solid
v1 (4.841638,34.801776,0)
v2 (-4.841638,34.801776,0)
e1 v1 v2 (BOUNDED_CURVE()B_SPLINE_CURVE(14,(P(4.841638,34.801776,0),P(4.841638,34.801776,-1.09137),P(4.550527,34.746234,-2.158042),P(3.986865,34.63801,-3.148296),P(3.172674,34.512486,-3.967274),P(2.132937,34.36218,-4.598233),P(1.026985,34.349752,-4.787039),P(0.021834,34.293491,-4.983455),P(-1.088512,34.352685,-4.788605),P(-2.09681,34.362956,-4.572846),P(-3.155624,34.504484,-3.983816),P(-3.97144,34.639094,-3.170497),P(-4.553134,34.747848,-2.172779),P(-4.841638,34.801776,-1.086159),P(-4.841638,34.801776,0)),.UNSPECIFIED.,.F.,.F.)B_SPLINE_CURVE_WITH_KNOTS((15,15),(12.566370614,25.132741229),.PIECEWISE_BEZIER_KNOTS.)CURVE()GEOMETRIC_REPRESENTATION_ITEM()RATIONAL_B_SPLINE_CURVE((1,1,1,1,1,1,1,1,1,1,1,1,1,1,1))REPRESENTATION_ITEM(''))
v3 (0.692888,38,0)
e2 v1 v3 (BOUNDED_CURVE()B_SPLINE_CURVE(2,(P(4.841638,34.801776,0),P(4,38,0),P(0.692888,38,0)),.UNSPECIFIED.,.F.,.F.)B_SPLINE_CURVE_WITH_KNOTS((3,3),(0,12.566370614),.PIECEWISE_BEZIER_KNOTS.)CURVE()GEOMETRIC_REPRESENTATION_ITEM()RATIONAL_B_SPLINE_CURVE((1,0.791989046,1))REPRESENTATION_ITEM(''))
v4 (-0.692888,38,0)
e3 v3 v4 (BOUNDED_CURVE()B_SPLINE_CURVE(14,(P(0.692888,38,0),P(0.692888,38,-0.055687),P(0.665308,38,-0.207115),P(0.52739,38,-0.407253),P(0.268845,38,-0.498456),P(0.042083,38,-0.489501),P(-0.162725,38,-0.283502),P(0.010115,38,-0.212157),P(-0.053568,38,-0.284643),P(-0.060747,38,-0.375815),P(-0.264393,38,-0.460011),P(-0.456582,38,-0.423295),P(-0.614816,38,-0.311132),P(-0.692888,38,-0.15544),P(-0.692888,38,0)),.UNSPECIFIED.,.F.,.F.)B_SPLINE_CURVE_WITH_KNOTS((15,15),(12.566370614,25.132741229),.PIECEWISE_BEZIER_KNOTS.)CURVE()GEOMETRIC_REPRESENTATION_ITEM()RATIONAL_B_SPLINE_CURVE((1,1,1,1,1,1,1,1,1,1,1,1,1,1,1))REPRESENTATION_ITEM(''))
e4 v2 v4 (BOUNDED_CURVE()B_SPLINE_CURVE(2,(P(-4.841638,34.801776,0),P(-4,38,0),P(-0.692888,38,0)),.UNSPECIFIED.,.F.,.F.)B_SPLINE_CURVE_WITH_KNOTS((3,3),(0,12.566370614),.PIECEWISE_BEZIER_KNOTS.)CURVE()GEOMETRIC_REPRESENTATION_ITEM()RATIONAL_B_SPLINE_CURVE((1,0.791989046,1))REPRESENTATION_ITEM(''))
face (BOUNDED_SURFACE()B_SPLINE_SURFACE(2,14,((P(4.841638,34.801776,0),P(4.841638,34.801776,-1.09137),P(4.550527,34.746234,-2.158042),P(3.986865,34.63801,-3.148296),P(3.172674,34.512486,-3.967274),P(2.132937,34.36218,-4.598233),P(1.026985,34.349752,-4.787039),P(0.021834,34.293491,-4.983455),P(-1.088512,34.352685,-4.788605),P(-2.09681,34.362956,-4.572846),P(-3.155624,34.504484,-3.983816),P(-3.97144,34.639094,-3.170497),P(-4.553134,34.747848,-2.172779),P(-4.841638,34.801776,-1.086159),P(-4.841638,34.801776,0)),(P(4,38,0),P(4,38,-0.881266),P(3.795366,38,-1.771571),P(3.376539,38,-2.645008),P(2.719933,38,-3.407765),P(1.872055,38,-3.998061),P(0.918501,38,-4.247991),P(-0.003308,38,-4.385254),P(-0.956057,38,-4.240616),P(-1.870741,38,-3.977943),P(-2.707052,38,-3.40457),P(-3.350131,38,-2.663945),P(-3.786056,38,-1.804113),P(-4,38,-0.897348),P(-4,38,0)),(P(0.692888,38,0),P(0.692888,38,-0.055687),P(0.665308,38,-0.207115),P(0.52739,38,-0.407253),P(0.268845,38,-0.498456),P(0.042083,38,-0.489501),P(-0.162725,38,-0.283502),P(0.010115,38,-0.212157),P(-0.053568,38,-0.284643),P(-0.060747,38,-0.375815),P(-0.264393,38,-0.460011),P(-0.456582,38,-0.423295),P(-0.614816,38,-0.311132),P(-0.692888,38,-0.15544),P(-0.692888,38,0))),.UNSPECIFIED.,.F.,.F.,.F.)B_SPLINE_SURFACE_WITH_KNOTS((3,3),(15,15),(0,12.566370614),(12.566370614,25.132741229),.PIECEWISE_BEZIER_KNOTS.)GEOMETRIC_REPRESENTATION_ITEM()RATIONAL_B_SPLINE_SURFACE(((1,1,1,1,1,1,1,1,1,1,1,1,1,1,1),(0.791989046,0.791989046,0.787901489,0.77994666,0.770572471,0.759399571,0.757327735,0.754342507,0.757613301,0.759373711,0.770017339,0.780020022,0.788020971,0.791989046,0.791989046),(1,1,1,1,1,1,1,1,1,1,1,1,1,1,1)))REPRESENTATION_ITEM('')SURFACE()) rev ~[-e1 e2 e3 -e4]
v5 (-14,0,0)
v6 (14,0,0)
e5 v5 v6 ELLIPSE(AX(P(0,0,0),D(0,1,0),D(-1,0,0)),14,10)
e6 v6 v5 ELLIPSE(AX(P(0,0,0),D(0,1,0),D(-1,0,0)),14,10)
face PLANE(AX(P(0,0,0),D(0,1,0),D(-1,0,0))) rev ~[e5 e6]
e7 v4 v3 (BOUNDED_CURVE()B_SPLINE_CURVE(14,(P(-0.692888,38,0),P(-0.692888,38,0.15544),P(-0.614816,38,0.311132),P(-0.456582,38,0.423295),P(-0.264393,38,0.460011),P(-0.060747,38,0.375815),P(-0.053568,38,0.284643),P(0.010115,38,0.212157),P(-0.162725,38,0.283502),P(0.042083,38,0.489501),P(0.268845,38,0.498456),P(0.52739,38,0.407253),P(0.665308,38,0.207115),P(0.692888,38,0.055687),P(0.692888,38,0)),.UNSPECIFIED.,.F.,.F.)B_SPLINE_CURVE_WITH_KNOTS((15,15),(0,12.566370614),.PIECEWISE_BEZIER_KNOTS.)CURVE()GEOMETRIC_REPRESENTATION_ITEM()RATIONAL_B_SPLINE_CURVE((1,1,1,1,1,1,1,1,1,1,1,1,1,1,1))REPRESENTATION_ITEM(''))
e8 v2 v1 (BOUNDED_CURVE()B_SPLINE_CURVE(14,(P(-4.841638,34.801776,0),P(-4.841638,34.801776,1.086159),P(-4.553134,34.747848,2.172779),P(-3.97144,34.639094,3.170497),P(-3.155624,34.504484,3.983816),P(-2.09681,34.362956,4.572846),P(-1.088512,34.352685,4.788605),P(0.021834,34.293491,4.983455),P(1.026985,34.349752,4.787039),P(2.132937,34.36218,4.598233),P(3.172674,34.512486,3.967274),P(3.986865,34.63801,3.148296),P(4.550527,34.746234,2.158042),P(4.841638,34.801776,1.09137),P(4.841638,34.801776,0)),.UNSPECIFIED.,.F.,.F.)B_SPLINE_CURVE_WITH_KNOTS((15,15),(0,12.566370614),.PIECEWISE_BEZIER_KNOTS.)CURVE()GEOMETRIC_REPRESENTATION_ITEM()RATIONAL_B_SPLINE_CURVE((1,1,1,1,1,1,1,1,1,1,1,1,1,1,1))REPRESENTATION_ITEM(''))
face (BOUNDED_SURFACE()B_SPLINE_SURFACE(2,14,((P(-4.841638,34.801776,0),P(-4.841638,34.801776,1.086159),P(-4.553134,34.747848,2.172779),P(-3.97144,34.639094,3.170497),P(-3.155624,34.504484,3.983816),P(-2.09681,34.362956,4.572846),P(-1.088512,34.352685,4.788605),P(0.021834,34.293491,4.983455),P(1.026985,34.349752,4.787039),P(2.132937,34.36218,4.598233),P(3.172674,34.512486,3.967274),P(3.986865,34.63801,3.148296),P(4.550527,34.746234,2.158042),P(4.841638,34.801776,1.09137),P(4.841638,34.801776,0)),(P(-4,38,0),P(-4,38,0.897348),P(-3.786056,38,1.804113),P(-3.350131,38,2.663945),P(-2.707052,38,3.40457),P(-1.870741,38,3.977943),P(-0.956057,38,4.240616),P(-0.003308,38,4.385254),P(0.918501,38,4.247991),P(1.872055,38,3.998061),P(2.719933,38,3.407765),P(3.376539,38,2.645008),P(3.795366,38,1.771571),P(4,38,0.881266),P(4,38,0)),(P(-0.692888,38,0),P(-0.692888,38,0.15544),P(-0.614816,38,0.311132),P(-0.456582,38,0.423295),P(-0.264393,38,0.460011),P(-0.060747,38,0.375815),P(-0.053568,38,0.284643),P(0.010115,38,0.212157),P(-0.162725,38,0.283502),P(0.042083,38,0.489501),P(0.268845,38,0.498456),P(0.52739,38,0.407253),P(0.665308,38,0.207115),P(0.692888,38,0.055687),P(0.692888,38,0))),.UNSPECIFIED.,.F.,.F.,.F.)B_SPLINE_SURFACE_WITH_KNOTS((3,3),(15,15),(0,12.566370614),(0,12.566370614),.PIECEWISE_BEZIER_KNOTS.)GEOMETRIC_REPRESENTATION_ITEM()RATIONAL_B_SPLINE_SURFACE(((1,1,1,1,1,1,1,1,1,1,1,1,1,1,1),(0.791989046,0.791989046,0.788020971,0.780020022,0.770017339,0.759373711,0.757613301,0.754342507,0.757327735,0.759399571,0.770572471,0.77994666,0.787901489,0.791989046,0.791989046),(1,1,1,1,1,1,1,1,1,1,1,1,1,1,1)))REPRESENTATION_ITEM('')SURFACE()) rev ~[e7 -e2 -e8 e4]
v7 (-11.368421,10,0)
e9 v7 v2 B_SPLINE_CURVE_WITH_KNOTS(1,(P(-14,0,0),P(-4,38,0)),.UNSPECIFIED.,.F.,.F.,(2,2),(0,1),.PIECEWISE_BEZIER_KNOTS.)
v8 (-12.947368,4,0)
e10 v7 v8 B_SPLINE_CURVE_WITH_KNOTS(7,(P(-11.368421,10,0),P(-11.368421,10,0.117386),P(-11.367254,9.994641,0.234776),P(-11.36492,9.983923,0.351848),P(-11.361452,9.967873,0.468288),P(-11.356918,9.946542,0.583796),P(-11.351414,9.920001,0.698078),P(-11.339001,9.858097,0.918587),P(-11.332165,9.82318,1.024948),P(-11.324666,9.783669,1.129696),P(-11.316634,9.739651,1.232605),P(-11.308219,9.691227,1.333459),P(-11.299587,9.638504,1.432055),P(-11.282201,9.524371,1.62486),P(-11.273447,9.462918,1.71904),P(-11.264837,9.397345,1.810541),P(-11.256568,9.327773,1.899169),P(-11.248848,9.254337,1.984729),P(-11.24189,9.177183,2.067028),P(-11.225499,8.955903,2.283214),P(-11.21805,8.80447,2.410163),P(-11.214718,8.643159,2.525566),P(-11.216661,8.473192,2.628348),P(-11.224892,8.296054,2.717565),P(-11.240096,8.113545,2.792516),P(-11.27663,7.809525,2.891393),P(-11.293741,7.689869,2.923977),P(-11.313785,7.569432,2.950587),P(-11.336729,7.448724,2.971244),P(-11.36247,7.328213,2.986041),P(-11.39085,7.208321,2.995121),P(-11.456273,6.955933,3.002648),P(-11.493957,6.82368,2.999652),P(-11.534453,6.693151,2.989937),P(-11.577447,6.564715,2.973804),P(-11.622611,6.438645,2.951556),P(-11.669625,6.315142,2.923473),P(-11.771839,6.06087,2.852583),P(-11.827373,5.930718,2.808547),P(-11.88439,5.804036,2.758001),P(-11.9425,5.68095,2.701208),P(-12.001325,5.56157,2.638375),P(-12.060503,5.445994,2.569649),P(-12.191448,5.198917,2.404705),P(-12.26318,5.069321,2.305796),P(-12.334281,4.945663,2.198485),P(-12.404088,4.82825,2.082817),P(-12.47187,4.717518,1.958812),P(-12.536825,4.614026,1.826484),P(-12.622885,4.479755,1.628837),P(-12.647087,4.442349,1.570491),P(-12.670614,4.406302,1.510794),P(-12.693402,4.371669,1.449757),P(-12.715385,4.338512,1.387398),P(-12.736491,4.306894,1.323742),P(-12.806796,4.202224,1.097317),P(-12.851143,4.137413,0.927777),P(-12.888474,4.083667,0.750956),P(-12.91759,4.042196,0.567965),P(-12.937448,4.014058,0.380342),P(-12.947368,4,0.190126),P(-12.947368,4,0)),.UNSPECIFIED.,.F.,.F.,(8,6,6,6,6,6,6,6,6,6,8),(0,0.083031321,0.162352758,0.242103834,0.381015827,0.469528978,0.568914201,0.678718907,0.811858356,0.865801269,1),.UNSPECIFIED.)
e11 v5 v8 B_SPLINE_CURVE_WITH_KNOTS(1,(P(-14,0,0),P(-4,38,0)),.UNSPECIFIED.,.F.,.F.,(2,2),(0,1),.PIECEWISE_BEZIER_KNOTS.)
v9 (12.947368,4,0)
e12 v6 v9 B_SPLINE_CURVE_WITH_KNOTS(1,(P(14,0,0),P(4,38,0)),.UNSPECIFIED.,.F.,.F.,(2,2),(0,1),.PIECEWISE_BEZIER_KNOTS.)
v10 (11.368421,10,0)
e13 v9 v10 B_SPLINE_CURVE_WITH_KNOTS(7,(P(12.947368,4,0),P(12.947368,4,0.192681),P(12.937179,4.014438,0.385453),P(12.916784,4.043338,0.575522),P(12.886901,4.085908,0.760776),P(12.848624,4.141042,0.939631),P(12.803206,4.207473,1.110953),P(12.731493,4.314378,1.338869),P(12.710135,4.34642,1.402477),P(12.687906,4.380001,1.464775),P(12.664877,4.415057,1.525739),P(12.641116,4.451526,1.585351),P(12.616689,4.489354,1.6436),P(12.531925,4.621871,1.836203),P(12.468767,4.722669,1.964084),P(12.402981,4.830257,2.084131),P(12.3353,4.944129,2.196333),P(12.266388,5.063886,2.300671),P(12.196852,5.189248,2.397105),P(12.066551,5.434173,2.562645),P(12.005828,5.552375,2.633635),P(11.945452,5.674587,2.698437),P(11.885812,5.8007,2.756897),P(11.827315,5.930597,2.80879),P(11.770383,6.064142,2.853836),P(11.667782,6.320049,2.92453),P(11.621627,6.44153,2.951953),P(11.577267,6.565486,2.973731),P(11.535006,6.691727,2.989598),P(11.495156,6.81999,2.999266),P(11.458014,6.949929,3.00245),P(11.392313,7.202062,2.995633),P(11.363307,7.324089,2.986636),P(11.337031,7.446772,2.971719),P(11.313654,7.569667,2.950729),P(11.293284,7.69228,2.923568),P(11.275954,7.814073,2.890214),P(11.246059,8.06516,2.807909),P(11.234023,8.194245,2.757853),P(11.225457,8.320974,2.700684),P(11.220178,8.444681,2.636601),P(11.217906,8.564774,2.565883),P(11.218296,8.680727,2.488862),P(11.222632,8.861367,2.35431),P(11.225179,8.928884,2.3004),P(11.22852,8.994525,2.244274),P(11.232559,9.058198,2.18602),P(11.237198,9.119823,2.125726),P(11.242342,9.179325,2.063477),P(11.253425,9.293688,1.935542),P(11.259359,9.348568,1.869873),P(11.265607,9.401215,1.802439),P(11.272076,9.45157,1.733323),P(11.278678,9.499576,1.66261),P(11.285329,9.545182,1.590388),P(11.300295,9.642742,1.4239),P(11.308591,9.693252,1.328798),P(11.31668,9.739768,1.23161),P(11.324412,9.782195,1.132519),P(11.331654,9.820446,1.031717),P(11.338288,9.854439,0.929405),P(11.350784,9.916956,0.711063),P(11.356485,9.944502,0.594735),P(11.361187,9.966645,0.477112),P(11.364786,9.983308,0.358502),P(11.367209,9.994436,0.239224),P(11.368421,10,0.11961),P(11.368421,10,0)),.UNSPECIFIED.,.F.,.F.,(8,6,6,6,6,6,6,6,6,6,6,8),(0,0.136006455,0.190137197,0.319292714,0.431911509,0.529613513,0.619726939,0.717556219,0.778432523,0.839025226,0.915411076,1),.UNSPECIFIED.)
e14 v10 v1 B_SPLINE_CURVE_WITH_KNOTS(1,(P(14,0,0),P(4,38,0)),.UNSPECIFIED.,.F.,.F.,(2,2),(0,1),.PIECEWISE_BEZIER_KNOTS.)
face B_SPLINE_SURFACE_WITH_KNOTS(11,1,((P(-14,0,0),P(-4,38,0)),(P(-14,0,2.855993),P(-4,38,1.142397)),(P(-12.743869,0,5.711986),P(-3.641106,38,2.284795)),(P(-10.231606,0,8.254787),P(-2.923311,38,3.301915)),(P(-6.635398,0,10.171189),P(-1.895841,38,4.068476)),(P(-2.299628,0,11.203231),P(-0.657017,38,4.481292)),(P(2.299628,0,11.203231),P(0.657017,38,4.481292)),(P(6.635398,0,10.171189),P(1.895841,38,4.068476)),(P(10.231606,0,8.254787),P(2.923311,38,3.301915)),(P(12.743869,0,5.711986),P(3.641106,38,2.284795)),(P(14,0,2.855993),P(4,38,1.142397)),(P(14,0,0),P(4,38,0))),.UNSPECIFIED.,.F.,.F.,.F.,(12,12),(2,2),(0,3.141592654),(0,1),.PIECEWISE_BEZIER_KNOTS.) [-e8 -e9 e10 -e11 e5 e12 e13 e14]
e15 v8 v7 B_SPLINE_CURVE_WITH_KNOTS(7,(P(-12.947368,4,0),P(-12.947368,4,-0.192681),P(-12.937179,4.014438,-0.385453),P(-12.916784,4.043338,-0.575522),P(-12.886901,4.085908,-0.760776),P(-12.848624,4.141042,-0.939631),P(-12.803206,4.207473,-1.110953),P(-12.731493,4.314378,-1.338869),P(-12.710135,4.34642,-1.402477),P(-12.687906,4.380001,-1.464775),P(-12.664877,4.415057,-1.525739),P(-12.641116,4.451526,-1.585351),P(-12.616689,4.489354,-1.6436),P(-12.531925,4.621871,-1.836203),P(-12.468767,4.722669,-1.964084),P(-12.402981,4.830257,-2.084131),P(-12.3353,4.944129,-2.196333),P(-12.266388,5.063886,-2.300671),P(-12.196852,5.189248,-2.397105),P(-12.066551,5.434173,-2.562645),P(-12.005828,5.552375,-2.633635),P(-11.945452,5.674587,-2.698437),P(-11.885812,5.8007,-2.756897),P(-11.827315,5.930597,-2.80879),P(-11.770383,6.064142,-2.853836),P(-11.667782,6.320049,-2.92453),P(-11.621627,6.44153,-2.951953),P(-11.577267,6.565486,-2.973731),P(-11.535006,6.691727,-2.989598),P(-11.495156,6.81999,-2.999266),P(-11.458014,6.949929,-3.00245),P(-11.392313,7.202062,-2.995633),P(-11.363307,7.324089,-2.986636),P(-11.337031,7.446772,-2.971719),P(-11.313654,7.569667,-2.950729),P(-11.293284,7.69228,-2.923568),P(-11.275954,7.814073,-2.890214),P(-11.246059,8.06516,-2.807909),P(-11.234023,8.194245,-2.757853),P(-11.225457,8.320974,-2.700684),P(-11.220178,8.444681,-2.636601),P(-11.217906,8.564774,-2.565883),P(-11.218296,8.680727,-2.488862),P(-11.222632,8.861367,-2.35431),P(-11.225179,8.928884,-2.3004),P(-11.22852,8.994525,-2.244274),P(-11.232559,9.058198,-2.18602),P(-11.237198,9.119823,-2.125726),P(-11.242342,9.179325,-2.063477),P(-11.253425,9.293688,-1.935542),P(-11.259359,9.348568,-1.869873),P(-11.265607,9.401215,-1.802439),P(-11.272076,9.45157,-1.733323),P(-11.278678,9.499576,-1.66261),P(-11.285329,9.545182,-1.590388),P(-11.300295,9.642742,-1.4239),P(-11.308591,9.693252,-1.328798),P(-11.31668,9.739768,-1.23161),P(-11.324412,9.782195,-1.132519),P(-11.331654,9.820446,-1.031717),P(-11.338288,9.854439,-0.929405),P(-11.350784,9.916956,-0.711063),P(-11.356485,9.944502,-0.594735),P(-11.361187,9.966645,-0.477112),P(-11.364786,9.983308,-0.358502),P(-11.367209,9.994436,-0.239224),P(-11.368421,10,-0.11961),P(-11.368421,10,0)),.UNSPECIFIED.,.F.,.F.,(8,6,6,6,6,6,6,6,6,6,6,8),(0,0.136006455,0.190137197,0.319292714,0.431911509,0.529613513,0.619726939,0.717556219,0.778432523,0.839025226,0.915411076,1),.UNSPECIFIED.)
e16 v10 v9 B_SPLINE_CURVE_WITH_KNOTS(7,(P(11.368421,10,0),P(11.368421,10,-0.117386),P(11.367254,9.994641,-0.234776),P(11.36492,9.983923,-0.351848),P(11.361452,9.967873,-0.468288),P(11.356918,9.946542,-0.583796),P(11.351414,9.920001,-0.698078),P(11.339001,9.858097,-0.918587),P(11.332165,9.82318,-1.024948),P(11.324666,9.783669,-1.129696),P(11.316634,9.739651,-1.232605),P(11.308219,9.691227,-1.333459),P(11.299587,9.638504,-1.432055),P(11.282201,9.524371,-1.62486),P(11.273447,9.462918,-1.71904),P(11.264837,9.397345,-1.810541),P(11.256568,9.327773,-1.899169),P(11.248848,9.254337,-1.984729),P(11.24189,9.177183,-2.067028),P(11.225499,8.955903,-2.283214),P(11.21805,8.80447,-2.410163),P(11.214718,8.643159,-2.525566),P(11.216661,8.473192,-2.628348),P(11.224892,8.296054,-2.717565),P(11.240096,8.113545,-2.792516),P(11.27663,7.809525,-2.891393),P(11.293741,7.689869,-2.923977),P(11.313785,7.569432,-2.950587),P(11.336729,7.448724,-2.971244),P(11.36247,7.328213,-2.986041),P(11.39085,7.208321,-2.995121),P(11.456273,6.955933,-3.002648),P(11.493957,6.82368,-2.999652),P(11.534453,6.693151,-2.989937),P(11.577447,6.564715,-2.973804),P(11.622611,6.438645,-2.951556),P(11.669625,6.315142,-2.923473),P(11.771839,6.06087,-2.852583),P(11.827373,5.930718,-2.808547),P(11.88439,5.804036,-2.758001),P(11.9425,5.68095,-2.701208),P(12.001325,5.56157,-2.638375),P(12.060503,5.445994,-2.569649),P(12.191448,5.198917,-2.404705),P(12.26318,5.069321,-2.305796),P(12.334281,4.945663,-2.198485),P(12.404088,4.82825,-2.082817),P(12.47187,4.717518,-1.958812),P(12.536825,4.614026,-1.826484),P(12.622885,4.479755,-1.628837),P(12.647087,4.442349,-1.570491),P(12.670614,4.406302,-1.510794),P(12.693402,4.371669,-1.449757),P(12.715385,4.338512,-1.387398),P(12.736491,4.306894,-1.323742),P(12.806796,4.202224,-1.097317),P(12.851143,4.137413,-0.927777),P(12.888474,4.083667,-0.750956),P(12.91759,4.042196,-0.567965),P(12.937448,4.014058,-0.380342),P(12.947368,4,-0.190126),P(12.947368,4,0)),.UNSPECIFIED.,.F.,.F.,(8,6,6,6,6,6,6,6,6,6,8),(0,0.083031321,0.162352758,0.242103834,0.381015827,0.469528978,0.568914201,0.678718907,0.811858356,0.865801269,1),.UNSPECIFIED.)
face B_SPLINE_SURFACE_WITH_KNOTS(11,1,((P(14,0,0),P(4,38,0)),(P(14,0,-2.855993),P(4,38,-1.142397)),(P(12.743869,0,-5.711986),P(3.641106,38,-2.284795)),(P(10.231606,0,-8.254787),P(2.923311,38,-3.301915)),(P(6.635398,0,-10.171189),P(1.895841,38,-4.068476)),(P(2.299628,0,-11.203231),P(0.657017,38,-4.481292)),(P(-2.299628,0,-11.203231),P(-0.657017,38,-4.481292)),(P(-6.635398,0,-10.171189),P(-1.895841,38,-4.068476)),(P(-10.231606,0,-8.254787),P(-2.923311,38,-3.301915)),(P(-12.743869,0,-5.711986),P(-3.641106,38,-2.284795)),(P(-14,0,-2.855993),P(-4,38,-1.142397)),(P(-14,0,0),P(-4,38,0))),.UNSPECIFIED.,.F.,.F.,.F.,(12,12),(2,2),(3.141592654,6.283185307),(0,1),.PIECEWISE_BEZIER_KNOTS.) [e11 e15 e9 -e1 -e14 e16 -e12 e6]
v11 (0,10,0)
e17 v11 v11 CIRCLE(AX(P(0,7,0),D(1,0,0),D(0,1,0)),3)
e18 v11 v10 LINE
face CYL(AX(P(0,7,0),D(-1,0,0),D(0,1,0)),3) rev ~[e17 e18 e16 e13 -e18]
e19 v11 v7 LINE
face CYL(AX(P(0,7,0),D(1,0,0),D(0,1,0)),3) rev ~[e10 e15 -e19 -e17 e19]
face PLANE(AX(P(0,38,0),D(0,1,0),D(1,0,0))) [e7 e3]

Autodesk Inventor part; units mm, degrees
ref_plane "YZ Plane" through (0, 0, 0) normal (1, 0, 0) x (0, 1, 0)
ref_plane "XZ Plane" through (0, 0, 0) normal (0, 1, 0) x (-1, 0, 0)
ref_plane "XY Plane" through (0, 0, 0) normal (0, 0, 1) x (1, 0, 0)
sketch "Sketch1" plane through (0, 0, 0) normal (0, 1, 0) x (-1, 0, 0)
  ellipse E0 centre (0, 0) end of major axis (14, 0) minor radius 10
  dimension "d0" = 10
  dimension "d1" = 14
ref_plane "Work Plane4" through (0, 38, 0) normal (0, 1, 0) x (1, 0, 0)
sketch "Sketch8" plane through (0, 38, 0) normal (0, 1, 0) x (1, 0, 0)
  circle A0 centre (0, 0) radius 4
  dimension "d13" = 8
loft "Loft2" add profiles "Sketch1", "Sketch8"
fillet "Fillet3" radius 4.29 2 edges at (0, 38, 4) (0, 38, -4)
sketch "Sketch9" plane through (0, 0, 0) normal (1, 0, 0) x (0, 1, 0)
  line L0 (0, 0) -> (34.8018, 0) projected
  circle A0 centre (7, 0) radius 3
  dimension "d20" = 6
  dimension "d21" = 7
extrude "Extrusion2" cut sketch "Sketch9" along normal through all both and the other way through all
properties part number "landing"
